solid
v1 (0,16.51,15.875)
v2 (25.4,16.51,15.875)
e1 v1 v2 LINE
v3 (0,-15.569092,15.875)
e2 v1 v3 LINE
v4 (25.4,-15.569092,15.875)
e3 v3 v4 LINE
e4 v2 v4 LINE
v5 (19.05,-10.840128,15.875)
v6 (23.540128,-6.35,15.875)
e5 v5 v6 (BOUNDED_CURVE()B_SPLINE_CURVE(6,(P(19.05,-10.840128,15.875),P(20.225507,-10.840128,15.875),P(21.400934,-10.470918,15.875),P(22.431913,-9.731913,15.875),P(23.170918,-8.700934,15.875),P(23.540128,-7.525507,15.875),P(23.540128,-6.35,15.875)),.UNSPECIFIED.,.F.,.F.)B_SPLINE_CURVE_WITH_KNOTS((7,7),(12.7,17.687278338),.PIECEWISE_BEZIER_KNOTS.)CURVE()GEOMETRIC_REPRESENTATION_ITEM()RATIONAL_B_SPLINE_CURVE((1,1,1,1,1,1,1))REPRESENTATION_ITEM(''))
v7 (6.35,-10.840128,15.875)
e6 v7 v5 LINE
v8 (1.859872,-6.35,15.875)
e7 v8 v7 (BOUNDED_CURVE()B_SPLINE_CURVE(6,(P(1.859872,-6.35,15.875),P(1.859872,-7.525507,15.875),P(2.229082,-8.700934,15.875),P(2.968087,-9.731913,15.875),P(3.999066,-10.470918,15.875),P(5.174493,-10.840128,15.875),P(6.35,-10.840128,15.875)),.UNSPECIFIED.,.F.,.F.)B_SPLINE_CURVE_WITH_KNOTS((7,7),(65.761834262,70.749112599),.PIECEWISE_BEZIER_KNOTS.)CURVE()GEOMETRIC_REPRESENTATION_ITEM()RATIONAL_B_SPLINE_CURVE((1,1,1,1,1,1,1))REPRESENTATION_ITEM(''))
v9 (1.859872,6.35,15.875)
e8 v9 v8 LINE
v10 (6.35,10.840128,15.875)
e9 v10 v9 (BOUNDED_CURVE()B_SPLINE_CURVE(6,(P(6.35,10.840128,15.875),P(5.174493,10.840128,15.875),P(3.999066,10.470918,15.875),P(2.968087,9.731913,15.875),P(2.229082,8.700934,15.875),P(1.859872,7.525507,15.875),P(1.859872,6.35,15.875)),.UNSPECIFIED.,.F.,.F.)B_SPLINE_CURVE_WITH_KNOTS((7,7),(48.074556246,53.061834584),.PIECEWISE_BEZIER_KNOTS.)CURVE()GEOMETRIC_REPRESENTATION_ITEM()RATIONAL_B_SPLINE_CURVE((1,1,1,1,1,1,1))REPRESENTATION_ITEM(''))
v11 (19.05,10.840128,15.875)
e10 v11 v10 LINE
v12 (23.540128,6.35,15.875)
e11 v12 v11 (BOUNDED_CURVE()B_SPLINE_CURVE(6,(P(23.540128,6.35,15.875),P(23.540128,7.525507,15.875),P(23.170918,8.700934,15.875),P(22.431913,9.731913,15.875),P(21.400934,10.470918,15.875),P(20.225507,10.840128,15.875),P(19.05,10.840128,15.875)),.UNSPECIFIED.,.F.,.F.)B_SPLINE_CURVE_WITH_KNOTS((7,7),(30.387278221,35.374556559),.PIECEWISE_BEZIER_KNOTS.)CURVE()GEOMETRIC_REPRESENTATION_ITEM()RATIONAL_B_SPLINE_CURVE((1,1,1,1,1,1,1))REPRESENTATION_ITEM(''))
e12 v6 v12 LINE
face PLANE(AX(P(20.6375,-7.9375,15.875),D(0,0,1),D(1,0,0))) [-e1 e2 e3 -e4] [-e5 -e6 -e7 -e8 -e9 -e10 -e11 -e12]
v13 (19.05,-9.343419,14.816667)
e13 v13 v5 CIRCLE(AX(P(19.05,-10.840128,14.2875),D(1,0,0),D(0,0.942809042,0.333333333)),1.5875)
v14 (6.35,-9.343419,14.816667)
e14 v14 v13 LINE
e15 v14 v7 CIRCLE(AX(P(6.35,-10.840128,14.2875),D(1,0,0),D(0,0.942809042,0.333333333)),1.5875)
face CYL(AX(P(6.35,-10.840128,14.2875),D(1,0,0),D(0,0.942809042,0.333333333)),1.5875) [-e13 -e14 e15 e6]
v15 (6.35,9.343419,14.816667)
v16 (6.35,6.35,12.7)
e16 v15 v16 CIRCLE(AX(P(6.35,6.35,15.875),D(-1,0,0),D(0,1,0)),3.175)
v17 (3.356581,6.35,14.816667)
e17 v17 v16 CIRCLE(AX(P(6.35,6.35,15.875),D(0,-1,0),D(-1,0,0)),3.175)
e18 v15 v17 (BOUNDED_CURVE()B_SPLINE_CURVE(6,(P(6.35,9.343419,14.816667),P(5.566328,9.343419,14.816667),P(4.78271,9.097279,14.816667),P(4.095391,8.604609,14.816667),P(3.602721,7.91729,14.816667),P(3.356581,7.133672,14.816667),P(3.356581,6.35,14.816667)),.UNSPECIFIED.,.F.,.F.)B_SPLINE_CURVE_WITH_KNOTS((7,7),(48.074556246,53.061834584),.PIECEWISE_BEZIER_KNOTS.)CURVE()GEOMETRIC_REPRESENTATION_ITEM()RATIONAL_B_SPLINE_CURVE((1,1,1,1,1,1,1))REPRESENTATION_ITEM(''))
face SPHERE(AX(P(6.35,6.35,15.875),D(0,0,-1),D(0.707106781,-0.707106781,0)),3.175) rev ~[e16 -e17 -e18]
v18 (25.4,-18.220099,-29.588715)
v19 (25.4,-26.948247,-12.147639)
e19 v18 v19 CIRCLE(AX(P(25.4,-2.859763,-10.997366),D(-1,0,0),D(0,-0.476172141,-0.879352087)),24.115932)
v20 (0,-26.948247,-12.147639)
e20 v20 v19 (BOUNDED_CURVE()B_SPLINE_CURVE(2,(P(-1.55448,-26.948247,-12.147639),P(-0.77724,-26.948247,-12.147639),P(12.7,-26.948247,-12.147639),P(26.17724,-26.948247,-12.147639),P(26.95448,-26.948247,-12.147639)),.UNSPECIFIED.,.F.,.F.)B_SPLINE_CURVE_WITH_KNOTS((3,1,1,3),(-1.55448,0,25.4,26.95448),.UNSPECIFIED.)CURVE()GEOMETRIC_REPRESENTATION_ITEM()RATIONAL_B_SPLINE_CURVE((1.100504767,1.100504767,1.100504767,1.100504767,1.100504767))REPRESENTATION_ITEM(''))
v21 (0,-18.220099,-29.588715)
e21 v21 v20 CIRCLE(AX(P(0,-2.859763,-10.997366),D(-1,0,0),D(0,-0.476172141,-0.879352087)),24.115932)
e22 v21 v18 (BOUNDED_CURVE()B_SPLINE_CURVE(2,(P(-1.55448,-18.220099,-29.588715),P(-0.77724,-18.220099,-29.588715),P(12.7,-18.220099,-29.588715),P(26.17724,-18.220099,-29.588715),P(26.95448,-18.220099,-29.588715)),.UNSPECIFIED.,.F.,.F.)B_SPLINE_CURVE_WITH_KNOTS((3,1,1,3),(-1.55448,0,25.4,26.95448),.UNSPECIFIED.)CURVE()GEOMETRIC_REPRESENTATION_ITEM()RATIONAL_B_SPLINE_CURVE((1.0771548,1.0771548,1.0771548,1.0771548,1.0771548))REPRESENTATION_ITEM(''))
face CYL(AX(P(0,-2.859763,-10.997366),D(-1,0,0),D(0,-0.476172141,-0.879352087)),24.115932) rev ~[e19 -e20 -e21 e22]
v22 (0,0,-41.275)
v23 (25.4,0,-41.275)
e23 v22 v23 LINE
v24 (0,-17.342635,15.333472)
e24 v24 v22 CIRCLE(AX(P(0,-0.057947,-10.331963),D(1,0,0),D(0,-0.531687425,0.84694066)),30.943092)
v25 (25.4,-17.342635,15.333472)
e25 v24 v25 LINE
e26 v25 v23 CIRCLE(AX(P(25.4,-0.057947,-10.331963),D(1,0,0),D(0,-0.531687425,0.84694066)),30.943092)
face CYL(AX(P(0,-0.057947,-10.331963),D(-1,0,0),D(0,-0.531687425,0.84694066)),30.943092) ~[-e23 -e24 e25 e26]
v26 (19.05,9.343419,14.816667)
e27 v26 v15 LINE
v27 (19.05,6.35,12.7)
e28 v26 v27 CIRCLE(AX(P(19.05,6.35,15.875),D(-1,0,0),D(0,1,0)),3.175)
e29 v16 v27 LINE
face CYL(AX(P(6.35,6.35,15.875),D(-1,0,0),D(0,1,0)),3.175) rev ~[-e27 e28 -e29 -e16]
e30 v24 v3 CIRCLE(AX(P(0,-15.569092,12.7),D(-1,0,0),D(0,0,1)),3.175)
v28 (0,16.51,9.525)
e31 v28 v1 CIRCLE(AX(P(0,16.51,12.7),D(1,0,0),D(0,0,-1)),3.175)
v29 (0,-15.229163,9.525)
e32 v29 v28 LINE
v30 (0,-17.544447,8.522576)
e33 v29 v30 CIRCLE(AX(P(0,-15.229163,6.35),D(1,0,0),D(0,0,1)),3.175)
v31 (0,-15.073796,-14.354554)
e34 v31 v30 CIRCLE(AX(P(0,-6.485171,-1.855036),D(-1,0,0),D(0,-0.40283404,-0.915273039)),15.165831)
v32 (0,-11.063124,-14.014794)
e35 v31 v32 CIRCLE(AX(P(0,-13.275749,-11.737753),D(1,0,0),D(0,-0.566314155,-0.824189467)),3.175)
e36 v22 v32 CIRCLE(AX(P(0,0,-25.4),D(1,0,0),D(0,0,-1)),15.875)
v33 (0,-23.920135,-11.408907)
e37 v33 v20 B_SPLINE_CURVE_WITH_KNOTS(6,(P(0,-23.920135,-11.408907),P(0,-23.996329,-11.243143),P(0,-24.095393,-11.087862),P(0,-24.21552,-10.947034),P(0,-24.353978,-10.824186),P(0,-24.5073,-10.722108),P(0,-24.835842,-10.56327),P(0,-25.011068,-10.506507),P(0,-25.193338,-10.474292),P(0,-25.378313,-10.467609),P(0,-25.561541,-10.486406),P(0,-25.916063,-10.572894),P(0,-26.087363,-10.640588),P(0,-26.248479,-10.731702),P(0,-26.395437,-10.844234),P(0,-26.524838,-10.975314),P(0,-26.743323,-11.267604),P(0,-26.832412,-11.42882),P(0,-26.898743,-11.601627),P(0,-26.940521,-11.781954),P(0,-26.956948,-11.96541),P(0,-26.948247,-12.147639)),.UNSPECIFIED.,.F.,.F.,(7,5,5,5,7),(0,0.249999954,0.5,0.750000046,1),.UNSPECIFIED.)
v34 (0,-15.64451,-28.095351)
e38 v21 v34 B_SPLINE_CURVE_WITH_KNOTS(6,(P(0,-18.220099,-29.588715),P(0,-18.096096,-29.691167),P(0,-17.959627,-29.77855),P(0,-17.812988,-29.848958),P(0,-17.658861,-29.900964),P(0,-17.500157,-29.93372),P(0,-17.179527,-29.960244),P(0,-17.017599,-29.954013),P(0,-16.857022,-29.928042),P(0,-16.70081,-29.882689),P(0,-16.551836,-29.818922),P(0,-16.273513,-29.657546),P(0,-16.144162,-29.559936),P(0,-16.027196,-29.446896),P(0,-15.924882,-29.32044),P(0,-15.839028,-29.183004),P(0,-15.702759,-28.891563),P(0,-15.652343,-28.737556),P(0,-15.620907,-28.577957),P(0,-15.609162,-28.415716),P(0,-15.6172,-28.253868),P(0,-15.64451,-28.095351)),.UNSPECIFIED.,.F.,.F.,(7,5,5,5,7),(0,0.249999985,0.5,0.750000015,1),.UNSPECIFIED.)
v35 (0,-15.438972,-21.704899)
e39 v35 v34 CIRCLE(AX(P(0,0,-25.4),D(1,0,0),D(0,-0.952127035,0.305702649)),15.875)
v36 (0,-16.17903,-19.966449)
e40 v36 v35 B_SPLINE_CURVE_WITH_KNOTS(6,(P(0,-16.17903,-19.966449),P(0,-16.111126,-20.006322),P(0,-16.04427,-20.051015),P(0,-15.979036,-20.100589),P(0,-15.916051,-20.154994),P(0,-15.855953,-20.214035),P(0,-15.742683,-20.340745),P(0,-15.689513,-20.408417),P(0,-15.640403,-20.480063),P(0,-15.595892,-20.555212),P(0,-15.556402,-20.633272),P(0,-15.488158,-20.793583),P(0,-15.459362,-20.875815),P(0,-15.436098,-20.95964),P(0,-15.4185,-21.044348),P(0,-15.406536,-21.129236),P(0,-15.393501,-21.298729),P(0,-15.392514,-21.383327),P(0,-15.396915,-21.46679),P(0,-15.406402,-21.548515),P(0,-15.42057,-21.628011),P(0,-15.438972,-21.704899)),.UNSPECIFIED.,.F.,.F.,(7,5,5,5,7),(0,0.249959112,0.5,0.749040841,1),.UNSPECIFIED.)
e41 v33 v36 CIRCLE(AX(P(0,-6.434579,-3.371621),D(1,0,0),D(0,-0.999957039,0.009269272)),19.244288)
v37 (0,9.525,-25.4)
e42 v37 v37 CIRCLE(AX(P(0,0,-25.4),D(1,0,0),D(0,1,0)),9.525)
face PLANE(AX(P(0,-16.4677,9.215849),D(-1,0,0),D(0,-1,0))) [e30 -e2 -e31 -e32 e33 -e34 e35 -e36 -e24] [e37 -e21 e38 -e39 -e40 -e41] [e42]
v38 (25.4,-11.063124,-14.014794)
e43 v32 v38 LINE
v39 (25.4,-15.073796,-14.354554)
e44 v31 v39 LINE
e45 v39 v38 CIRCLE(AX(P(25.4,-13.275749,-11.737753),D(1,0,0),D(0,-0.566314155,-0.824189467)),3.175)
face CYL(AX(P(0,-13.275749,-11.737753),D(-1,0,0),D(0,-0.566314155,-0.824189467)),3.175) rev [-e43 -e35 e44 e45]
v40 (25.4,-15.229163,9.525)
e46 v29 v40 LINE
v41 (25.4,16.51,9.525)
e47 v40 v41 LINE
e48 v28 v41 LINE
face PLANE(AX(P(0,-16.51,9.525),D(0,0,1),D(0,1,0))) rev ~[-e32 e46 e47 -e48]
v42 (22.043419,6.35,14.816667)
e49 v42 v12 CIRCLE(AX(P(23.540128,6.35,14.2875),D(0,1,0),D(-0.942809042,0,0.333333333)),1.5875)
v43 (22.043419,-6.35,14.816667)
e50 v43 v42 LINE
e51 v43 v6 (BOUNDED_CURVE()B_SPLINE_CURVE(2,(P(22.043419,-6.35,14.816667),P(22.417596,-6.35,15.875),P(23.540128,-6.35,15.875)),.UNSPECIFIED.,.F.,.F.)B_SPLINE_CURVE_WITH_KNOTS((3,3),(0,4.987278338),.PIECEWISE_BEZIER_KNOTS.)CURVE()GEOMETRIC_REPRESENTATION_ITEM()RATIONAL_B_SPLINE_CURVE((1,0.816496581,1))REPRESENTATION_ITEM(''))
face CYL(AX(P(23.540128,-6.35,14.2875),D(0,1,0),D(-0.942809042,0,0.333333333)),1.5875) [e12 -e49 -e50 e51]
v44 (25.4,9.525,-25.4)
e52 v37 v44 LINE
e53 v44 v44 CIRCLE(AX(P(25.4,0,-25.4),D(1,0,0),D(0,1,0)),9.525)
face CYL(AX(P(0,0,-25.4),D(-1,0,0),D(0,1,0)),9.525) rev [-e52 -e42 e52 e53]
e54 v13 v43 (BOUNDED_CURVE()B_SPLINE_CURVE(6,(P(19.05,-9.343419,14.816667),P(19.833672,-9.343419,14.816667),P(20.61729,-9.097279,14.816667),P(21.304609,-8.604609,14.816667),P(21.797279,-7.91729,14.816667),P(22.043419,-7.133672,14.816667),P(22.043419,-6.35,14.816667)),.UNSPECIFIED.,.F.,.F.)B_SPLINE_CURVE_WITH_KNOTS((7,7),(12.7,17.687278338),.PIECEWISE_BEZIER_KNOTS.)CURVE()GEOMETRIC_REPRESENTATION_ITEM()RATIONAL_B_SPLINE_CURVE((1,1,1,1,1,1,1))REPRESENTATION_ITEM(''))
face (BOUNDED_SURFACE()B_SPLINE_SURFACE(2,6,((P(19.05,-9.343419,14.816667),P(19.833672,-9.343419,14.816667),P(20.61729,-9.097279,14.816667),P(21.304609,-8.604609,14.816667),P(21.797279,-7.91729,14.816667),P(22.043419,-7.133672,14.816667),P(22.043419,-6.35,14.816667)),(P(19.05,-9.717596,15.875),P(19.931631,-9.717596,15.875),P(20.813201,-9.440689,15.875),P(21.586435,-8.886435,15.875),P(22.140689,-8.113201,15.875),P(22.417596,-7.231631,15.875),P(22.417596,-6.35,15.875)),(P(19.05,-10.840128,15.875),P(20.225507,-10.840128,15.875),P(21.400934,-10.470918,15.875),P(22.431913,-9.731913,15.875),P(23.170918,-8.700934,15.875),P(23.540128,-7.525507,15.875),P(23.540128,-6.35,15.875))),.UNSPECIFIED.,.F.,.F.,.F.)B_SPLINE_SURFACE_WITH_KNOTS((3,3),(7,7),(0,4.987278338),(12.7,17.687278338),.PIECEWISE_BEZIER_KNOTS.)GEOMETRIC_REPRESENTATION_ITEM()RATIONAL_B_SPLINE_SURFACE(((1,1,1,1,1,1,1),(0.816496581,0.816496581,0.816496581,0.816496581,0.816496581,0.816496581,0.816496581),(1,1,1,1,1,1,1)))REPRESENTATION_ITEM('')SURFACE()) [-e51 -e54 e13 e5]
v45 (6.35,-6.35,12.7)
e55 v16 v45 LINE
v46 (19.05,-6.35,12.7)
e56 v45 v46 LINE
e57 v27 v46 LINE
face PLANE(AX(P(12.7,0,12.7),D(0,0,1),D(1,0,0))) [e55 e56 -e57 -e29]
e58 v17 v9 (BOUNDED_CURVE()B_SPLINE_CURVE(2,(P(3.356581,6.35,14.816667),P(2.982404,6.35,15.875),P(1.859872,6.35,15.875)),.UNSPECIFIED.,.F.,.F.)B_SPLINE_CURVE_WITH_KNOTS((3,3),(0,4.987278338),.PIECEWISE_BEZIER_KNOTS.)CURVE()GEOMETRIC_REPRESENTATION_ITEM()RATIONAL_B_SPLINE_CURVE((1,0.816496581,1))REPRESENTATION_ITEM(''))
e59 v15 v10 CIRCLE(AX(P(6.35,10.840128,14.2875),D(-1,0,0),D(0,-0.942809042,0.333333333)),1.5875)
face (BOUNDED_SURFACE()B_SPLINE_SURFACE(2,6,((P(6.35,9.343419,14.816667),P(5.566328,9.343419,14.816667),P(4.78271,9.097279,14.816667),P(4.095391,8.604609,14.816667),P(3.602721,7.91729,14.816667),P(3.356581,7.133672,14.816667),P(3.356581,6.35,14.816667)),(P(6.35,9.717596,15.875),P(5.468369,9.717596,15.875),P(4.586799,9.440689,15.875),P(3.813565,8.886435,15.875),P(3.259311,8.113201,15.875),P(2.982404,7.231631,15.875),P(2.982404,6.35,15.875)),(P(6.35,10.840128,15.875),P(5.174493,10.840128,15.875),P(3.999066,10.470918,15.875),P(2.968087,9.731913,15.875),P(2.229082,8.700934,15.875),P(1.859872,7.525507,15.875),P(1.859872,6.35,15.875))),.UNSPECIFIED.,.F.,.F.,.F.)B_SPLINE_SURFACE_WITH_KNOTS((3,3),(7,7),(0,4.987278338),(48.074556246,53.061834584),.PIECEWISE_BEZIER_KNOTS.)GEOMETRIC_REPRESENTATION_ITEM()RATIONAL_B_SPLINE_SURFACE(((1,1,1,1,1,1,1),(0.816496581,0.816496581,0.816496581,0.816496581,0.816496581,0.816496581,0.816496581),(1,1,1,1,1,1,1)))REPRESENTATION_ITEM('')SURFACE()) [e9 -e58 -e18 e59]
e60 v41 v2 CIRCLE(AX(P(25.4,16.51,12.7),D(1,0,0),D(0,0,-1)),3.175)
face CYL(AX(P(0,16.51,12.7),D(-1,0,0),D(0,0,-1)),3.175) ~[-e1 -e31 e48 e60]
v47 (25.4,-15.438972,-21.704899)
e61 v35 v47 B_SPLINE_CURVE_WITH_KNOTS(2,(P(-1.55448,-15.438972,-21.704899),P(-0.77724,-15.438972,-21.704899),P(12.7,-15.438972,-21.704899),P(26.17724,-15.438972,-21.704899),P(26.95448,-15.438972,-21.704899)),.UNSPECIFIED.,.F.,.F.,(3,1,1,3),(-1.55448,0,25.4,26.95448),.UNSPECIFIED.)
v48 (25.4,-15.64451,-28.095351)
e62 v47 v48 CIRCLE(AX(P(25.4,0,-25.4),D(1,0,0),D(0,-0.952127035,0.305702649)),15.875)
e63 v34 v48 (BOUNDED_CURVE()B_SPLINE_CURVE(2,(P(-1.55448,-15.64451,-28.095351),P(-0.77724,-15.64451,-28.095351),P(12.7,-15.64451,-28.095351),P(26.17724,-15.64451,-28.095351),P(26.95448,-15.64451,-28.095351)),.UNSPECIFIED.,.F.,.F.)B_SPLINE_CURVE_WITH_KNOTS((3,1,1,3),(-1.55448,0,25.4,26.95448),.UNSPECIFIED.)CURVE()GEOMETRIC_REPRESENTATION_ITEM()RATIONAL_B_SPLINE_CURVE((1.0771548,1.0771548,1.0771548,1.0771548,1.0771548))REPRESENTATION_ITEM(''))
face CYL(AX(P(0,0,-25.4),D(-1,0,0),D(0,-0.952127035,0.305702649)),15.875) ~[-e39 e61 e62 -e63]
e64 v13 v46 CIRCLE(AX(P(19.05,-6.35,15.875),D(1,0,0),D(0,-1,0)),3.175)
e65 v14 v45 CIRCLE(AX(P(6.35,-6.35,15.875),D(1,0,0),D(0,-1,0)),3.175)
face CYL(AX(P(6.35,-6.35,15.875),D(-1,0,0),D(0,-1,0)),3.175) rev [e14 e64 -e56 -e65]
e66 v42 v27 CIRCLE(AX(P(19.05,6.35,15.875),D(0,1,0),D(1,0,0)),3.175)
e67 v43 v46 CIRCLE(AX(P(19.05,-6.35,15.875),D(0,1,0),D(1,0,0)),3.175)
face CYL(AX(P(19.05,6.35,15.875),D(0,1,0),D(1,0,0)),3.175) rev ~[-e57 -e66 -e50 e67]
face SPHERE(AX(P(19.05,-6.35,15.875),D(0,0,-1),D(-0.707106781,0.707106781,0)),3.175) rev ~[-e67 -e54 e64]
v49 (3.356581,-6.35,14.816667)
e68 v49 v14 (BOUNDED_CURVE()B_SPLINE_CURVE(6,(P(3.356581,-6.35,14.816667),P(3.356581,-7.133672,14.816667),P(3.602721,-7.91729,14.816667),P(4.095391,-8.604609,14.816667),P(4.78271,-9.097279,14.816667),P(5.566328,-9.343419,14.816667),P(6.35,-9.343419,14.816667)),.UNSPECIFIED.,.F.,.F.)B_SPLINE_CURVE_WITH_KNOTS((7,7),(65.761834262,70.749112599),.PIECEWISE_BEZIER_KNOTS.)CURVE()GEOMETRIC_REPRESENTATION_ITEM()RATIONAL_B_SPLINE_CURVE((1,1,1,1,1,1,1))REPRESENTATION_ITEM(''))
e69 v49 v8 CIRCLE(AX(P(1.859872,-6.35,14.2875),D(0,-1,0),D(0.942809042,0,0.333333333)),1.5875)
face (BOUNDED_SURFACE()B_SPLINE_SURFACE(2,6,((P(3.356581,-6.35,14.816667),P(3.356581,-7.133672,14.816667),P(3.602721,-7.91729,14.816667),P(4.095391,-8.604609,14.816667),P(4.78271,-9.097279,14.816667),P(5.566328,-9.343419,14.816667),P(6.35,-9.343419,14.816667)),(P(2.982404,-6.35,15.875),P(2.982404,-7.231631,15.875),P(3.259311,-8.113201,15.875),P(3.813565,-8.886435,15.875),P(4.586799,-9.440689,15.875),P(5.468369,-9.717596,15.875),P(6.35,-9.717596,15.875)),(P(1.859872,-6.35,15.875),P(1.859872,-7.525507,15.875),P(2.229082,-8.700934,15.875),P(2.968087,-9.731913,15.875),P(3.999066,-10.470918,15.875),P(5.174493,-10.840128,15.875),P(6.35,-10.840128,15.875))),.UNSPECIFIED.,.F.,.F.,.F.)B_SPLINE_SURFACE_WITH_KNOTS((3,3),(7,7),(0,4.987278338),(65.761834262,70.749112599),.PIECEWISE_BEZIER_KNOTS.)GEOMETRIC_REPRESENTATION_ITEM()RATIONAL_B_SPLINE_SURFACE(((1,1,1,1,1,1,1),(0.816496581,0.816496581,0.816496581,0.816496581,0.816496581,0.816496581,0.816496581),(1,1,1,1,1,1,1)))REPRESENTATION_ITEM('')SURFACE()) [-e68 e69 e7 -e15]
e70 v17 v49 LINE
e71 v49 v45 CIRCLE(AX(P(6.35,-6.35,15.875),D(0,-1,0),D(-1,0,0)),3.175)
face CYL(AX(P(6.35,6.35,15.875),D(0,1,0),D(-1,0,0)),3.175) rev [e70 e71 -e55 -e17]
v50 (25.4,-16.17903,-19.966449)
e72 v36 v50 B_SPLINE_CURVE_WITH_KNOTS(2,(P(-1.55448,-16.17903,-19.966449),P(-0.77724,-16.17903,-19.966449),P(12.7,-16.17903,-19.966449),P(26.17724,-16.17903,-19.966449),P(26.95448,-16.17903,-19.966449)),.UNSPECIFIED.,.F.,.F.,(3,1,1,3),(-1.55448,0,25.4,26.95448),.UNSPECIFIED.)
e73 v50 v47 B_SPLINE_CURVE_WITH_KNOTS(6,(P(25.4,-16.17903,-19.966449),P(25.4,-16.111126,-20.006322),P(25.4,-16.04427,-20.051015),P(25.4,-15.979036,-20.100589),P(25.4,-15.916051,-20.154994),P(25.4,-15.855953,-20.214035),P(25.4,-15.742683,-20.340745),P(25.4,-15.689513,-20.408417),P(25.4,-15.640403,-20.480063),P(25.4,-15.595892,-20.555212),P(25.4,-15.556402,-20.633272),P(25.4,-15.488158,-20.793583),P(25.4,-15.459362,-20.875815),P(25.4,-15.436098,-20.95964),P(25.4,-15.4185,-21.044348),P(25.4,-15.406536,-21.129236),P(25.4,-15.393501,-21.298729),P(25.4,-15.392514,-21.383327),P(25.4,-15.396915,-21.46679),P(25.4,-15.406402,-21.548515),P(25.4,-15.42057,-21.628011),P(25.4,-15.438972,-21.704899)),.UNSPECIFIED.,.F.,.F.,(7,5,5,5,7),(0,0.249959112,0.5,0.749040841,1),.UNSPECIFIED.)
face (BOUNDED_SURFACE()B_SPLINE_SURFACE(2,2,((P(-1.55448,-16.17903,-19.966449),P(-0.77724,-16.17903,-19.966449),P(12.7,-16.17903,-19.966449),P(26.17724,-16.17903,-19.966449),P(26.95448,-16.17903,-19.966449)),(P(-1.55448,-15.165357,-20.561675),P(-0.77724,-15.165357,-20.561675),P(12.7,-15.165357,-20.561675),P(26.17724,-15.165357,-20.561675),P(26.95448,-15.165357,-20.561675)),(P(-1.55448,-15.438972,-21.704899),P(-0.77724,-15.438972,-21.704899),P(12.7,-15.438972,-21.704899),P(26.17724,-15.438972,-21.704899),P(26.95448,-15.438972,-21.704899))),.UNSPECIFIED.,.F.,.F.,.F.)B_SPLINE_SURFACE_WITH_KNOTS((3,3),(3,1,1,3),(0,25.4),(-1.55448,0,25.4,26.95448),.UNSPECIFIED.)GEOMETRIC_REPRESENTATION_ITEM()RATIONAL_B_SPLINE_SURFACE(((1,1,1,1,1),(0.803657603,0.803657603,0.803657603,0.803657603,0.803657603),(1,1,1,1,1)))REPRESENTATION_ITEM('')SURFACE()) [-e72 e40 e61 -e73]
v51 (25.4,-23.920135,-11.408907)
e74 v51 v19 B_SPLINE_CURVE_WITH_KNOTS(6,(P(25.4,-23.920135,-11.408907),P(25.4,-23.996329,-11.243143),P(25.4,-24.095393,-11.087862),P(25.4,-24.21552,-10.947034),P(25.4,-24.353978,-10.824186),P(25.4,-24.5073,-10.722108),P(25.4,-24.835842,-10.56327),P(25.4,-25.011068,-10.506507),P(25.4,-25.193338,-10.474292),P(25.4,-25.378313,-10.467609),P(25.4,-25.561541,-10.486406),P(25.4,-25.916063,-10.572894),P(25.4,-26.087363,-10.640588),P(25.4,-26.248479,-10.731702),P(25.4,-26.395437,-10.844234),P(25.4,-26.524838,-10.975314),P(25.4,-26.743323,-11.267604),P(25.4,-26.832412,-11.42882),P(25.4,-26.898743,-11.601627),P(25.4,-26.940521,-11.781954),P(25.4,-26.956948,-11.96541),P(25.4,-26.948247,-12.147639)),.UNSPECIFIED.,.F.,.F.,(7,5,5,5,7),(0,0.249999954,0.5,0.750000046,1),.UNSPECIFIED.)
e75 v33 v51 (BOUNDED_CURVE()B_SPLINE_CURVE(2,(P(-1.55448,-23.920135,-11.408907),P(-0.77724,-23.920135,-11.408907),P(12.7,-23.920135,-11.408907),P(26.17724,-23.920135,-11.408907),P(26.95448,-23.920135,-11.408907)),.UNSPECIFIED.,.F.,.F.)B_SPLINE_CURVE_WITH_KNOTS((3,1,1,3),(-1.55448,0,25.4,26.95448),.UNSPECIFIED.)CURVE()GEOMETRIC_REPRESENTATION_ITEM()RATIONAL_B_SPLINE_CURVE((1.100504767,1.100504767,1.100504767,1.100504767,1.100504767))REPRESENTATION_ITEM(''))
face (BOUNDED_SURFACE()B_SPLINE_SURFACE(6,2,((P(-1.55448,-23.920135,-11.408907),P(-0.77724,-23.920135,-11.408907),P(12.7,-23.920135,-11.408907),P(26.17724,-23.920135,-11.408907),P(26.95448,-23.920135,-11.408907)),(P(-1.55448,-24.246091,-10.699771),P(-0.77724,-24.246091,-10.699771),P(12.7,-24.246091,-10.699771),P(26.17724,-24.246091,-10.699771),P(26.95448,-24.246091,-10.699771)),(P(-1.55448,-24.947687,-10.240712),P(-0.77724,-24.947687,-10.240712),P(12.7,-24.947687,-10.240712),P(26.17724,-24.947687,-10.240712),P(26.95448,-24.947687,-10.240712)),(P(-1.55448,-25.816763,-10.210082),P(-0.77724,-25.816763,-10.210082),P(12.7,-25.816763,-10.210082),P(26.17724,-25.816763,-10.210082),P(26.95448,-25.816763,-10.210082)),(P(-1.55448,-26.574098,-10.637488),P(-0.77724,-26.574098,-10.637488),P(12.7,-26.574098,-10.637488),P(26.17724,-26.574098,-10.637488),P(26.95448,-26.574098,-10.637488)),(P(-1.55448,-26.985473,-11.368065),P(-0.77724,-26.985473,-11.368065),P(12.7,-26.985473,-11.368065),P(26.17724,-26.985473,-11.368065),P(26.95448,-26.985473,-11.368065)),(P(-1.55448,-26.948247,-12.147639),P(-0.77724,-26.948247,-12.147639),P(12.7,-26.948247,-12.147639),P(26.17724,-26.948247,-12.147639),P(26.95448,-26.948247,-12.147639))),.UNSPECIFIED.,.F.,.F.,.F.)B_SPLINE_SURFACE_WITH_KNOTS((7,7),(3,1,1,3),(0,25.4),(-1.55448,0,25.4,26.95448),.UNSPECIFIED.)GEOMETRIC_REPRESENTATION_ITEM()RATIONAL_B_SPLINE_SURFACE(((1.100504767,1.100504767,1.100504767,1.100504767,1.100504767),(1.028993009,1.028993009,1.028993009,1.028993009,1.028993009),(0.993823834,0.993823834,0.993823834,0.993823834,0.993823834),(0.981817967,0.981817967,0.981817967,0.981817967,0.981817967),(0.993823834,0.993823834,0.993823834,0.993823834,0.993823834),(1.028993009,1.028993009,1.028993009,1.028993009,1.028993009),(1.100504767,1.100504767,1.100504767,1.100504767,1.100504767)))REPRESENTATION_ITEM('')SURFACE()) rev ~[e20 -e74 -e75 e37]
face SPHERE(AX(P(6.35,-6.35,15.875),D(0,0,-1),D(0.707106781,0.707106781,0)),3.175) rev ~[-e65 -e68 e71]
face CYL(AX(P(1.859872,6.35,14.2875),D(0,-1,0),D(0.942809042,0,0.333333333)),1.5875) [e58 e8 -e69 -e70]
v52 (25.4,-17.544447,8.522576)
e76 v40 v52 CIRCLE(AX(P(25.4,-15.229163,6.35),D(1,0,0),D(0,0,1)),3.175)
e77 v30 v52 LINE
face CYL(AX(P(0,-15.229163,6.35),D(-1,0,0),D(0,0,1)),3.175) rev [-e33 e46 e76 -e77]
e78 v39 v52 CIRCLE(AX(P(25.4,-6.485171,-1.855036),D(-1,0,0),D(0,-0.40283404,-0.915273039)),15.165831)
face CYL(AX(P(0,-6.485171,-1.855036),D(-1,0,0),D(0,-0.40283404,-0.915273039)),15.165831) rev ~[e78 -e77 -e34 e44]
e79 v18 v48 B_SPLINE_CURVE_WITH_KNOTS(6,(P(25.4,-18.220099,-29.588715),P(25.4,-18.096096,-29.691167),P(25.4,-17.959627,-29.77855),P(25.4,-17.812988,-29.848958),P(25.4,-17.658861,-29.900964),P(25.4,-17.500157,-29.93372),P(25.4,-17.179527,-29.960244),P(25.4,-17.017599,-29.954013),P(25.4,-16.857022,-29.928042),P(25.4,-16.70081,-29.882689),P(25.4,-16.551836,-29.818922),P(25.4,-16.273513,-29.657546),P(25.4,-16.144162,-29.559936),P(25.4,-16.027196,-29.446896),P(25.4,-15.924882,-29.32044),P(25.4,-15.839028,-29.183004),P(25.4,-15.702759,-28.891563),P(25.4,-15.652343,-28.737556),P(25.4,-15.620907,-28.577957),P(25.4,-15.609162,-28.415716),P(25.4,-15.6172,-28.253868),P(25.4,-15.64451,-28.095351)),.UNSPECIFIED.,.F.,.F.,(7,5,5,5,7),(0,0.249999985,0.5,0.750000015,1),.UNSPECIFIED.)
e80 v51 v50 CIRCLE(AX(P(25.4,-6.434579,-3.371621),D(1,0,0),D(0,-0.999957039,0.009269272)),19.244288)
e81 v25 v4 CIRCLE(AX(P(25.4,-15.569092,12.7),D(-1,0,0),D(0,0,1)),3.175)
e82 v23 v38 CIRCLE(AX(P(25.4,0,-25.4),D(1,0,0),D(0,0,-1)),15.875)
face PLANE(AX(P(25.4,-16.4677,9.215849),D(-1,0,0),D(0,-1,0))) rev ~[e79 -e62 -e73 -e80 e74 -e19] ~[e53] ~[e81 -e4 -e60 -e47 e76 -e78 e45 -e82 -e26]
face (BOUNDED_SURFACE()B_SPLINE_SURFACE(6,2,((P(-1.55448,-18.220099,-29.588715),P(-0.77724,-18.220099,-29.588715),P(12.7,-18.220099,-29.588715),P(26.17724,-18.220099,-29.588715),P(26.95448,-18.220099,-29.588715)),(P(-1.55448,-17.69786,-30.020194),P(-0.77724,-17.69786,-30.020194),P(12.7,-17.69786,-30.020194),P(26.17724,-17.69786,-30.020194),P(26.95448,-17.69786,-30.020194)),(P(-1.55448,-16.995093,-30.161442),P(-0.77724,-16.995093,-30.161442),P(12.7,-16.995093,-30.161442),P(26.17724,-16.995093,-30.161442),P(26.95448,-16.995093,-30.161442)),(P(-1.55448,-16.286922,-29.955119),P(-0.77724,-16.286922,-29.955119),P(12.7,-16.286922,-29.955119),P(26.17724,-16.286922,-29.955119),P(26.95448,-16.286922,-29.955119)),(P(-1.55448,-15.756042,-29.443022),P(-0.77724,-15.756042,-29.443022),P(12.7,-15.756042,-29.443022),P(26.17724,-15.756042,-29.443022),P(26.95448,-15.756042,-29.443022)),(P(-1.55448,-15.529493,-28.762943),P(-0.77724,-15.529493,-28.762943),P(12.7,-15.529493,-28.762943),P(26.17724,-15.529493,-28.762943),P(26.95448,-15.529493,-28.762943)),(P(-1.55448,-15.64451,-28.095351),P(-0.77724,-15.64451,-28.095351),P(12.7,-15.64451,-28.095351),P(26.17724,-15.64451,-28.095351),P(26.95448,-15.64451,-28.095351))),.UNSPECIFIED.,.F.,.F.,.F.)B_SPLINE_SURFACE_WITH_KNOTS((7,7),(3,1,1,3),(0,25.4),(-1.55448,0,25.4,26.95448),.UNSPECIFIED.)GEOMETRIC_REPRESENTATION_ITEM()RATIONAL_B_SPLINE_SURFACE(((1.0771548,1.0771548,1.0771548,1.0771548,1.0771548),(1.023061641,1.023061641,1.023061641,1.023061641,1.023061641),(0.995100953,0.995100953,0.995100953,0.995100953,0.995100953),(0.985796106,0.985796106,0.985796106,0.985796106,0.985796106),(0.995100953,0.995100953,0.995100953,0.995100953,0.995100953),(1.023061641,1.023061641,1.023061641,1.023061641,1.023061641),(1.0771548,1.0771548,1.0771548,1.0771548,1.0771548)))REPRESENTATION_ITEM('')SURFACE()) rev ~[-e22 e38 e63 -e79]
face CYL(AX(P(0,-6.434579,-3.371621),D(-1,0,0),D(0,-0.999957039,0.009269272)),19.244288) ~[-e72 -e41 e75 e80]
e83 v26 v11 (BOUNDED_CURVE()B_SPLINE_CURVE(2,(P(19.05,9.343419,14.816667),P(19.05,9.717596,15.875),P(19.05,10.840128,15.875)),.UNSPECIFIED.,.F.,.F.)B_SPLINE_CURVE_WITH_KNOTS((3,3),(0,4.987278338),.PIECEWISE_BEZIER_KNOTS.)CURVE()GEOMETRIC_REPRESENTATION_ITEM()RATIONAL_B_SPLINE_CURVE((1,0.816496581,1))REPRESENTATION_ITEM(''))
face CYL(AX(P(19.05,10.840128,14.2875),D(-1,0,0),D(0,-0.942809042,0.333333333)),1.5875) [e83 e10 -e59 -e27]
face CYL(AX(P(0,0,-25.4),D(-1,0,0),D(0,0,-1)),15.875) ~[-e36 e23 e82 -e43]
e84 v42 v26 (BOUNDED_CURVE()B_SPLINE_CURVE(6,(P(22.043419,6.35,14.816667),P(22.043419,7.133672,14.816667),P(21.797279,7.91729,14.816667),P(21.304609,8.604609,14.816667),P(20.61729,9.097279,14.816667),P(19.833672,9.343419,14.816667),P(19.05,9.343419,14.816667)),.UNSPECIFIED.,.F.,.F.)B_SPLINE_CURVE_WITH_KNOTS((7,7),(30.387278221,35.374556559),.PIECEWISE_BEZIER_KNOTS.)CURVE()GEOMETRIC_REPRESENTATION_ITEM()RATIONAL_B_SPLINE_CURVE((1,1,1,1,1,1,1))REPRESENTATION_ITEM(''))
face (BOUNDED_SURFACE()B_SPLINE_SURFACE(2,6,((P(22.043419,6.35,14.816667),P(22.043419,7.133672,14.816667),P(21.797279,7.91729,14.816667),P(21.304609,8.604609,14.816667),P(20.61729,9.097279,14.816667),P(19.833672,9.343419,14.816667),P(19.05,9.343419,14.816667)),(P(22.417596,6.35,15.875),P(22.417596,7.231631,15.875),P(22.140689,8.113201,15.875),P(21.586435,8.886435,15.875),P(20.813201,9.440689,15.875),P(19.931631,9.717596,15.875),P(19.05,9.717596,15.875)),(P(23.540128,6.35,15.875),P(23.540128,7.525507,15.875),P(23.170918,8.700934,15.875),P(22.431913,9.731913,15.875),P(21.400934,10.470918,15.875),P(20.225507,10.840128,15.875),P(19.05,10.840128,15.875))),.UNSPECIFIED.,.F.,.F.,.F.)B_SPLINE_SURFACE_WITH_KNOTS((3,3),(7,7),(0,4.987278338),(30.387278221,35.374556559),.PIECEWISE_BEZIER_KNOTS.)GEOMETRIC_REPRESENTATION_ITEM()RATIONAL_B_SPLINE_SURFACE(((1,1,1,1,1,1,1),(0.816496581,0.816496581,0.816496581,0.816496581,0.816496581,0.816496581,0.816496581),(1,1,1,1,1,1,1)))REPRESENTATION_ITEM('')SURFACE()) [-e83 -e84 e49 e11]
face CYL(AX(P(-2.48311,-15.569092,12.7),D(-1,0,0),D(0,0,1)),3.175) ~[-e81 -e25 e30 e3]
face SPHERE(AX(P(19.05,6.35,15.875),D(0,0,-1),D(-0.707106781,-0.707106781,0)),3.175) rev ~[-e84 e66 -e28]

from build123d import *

# Parameters (mm, degrees)
F0_R         = 9.525
F1_DEPTH     = 25.4
F2_W         = 19.05
F2_H         = 19.05
F3_DEPTH     = 3.175
F4_T1_DEPTH  = 25.4
F4_T3_DEPTH  = 12.7
F4_T5_DEPTH  = 12.7
F4_S9_W      = 3.175
F4_S9_H      = 3.175
F4_T10_DEPTH = 3.175
F4_S15_W     = 3.175
F4_S15_H     = 3.175
F4_T16_DEPTH = 3.175
F4_S21_W     = 3.175
F4_S21_H     = 3.175
F4_T22_DEPTH = 3.175
F4_S27_W     = 3.175
F4_S27_H     = 3.175
F4_T28_DEPTH = 3.175
F4_T31_DEPTH = 30.3662191739
F5_R         = 1.5875


# Not quite as in the source:
# - a fillet or chamfer that OpenCascade refuses, or shapes differently, is made with other operations: its cross-section is extruded or revolved along the edge and cut away or added


with BuildPart() as f1:
    # F0 (on Right) → F1 (new body)
    with BuildSketch(Plane.YZ):
        with BuildLine():
            Line((16.51, 15.875), (-16.51, 15.875))
            ThreePointArc((-16.51, 15.875), (-29.7854143214, -18.9198974706), (0, -41.275))
            ThreePointArc((0, -41.275), (14.2378547718, -18.3786670428), (-12.5944842771, -15.7359123145))
            ThreePointArc((-12.5944842771, -15.7359123145), (-21.4720341133, -4.1780442704), (-16.51, 9.525))
            Line((-16.51, 9.525), (16.51, 9.525))
            ThreePointArc((16.51, 9.525), (19.685, 12.7), (16.51, 15.875))
        make_face()
        with BuildLine():
            ThreePointArc((-14.343097751, -32.2037615996), (-25.3220142156, -19.7737801421), (-25.6780404598, -3.1932406127))
            ThreePointArc((-25.6780404598, -3.1932406127), (-22.8730710881, -13.3775496244), (-15.115016679, -20.5469704521))
            ThreePointArc((-15.115016679, -20.5469704521), (-15.8403068596, -26.4489535701), (-14.343097751, -32.2037615996))
        make_face(mode=Mode.SUBTRACT)
        with Locations((0, -25.4)):
            Circle(F0_R, mode=Mode.SUBTRACT)
    extrude(amount=F1_DEPTH)

    # F2 (on face) → F3 (cut)
    with BuildSketch(Plane.XY.offset(15.875)):
        with Locations((12.7, 0)):
            Rectangle(F2_W, F2_H)
    extrude(amount=-F3_DEPTH, mode=Mode.SUBTRACT)

    # F4: fillet of radius 3.175 on 11 edges, made by hand

    # F4_s2 → F4_t1 (join)
    with BuildSketch(Plane.YZ):
        with BuildLine():
            ThreePointArc((-15.229163377, 9.525), (-16.4906498384, 9.2636363719), (-17.5444470536, 8.5225760049))
            ThreePointArc((-17.5444470536, 8.5225760049), (-17.0391316289, 9.0360765162), (-16.51, 9.525))
            Line((-16.51, 9.525), (-15.229163377, 9.525))
        make_face()
        with BuildLine():
            ThreePointArc((-15.0737959989, -14.3545542957), (-13.0077413525, -14.9014210416), (-11.0631237972, -14.0147939479))
            ThreePointArc((-11.0631237972, -14.0147939479), (-11.8600660646, -14.8475378256), (-12.5944842771, -15.7359123145))
            ThreePointArc((-12.5944842771, -15.7359123145), (-13.8665248674, -15.1033585978), (-15.0737959989, -14.3545542957))
        make_face()
    extrude(amount=F4_T1_DEPTH)

    # F4_s4 → F4_t3 (join)
    with BuildSketch(Plane.YZ.offset(6.35)):
        with BuildLine():
            ThreePointArc((9.525, 15.875), (8.5950640303, 13.6299359697), (6.35, 12.7))
            Line((6.35, 12.7), (9.525, 12.7))
            Line((9.525, 12.7), (9.525, 15.875))
        make_face()
        with BuildLine():
            ThreePointArc((-9.525, 15.875), (-8.5950640303, 13.6299359697), (-6.35, 12.7))
            Line((-6.35, 12.7), (-9.525, 12.7))
            Line((-9.525, 12.7), (-9.525, 15.875))
        make_face()
    extrude(amount=F4_T3_DEPTH)

    # F4_s6 → F4_t5 (join)
    with BuildSketch(Plane.XZ.offset(-6.35)):
        with BuildLine():
            ThreePointArc((3.175, 15.875), (4.1049359697, 13.6299359697), (6.35, 12.7))
            Line((6.35, 12.7), (3.175, 12.7))
            Line((3.175, 12.7), (3.175, 15.875))
        make_face()
        with BuildLine():
            ThreePointArc((22.225, 15.875), (21.2950640303, 13.6299359697), (19.05, 12.7))
            Line((19.05, 12.7), (22.225, 12.7))
            Line((22.225, 12.7), (22.225, 15.875))
        make_face()
    extrude(amount=F4_T5_DEPTH)


with BuildPart() as f4_tool8:
    # F4_s9 → F4_t10 (new body)
    with BuildSketch(Plane.XY.offset(15.875)):
        with Locations((20.6375, 7.9375)):
            Rectangle(F4_S9_W, F4_S9_H)
    extrude(amount=-F4_T10_DEPTH)

    # F4_s11 → F4_t12 (revolve, cut)
    with BuildSketch(Plane(origin=(19.05, 6.35, 15.875), x_dir=(-0.7071067812, -0.7071067812, 0), z_dir=(0.7071067812, -0.7071067812, 0))):
        with BuildLine():
            ThreePointArc((0, -3.175), (3.175, 0), (0, 3.175))
            Line((0, 3.175), (0, -3.175))
        make_face()
    revolve(axis=Axis((19.05, 6.35, 15.875), (0, 0, -1)), mode=Mode.SUBTRACT)


with BuildPart() as f1_1:
    add(f1.part)

    # F4_t7: union F4_tool8
    add(f4_tool8.part)


with BuildPart() as f4_tool14:
    # F4_s15 → F4_t16 (new body)
    with BuildSketch(Plane.XY.offset(15.875)):
        with Locations((4.7625, 7.9375)):
            Rectangle(F4_S15_W, F4_S15_H)
    extrude(amount=-F4_T16_DEPTH)

    # F4_s17 → F4_t18 (revolve, cut)
    with BuildSketch(Plane(origin=(6.35, 6.35, 15.875), x_dir=(0.7071067812, -0.7071067812, 0), z_dir=(0.7071067812, 0.7071067812, 0))):
        with BuildLine():
            ThreePointArc((0, -3.175), (3.175, 0), (0, 3.175))
            Line((0, 3.175), (0, -3.175))
        make_face()
    revolve(axis=Axis((6.35, 6.35, 15.875), (0, 0, -1)), mode=Mode.SUBTRACT)


with BuildPart() as f1_2:
    add(f1_1.part)

    # F4_t13: union F4_tool14
    add(f4_tool14.part)


with BuildPart() as f4_tool20:
    # F4_s21 → F4_t22 (new body)
    with BuildSketch(Plane.XY.offset(15.875)):
        with Locations((4.7625, -7.9375)):
            Rectangle(F4_S21_W, F4_S21_H)
    extrude(amount=-F4_T22_DEPTH)

    # F4_s23 → F4_t24 (revolve, cut)
    with BuildSketch(Plane(origin=(6.35, -6.35, 15.875), x_dir=(0.7071067812, 0.7071067812, 0), z_dir=(-0.7071067812, 0.7071067812, 0))):
        with BuildLine():
            ThreePointArc((0, -3.175), (3.175, 0), (0, 3.175))
            Line((0, 3.175), (0, -3.175))
        make_face()
    revolve(axis=Axis((6.35, -6.35, 15.875), (0, 0, -1)), mode=Mode.SUBTRACT)


with BuildPart() as f1_3:
    add(f1_2.part)

    # F4_t19: union F4_tool20
    add(f4_tool20.part)


with BuildPart() as f4_tool26:
    # F4_s27 → F4_t28 (new body)
    with BuildSketch(Plane.XY.offset(15.875)):
        with Locations((20.6375, -7.9375)):
            Rectangle(F4_S27_W, F4_S27_H)
    extrude(amount=-F4_T28_DEPTH)

    # F4_s29 → F4_t30 (revolve, cut)
    with BuildSketch(Plane(origin=(19.05, -6.35, 15.875), x_dir=(-0.7071067812, 0.7071067812, 0), z_dir=(-0.7071067812, -0.7071067812, 0))):
        with BuildLine():
            ThreePointArc((0, -3.175), (3.175, 0), (0, 3.175))
            Line((0, 3.175), (0, -3.175))
        make_face()
    revolve(axis=Axis((19.05, -6.35, 15.875), (0, 0, -1)), mode=Mode.SUBTRACT)


with BuildPart() as f1_4:
    add(f1_3.part)

    # F4_t25: union F4_tool26
    add(f4_tool26.part)

    # F4_s32 → F4_t31 (cut)
    with BuildSketch(Plane.YZ.offset(-2.483109587)):
        with BuildLine():
            ThreePointArc((-15.5690922553, 15.875), (-16.4962795763, 15.7366015003), (-17.3426345609, 15.3334716042))
            ThreePointArc((-17.3426345609, 15.3334716042), (-16.9284902387, 15.6075768645), (-16.51, 15.875))
            Line((-16.51, 15.875), (-15.5690922553, 15.875))
        make_face()
    extrude(amount=F4_T31_DEPTH, mode=Mode.SUBTRACT)

    # F5
    f5_edges = [f1_4.edges().sort_by_distance(p)[0] for p in [
        (12.7, -9.525, 15.875),
        (3.175, 0, 15.875),
        (12.7, 9.525, 15.875),
        (22.225, 0, 15.875),
        (12.7, -15.115017, -20.54697),
        (12.7, -14.343098, -32.203762),
        (12.7, -25.67804, -3.193241),
        (21.295064, 8.595064, 15.875),
        (21.295064, -8.595064, 15.875),
        (4.104936, 8.595064, 15.875),
        (4.104936, -8.595064, 15.875),
    ]]
    fillet(f5_edges, radius=F5_R)


solid = f1_4.part
